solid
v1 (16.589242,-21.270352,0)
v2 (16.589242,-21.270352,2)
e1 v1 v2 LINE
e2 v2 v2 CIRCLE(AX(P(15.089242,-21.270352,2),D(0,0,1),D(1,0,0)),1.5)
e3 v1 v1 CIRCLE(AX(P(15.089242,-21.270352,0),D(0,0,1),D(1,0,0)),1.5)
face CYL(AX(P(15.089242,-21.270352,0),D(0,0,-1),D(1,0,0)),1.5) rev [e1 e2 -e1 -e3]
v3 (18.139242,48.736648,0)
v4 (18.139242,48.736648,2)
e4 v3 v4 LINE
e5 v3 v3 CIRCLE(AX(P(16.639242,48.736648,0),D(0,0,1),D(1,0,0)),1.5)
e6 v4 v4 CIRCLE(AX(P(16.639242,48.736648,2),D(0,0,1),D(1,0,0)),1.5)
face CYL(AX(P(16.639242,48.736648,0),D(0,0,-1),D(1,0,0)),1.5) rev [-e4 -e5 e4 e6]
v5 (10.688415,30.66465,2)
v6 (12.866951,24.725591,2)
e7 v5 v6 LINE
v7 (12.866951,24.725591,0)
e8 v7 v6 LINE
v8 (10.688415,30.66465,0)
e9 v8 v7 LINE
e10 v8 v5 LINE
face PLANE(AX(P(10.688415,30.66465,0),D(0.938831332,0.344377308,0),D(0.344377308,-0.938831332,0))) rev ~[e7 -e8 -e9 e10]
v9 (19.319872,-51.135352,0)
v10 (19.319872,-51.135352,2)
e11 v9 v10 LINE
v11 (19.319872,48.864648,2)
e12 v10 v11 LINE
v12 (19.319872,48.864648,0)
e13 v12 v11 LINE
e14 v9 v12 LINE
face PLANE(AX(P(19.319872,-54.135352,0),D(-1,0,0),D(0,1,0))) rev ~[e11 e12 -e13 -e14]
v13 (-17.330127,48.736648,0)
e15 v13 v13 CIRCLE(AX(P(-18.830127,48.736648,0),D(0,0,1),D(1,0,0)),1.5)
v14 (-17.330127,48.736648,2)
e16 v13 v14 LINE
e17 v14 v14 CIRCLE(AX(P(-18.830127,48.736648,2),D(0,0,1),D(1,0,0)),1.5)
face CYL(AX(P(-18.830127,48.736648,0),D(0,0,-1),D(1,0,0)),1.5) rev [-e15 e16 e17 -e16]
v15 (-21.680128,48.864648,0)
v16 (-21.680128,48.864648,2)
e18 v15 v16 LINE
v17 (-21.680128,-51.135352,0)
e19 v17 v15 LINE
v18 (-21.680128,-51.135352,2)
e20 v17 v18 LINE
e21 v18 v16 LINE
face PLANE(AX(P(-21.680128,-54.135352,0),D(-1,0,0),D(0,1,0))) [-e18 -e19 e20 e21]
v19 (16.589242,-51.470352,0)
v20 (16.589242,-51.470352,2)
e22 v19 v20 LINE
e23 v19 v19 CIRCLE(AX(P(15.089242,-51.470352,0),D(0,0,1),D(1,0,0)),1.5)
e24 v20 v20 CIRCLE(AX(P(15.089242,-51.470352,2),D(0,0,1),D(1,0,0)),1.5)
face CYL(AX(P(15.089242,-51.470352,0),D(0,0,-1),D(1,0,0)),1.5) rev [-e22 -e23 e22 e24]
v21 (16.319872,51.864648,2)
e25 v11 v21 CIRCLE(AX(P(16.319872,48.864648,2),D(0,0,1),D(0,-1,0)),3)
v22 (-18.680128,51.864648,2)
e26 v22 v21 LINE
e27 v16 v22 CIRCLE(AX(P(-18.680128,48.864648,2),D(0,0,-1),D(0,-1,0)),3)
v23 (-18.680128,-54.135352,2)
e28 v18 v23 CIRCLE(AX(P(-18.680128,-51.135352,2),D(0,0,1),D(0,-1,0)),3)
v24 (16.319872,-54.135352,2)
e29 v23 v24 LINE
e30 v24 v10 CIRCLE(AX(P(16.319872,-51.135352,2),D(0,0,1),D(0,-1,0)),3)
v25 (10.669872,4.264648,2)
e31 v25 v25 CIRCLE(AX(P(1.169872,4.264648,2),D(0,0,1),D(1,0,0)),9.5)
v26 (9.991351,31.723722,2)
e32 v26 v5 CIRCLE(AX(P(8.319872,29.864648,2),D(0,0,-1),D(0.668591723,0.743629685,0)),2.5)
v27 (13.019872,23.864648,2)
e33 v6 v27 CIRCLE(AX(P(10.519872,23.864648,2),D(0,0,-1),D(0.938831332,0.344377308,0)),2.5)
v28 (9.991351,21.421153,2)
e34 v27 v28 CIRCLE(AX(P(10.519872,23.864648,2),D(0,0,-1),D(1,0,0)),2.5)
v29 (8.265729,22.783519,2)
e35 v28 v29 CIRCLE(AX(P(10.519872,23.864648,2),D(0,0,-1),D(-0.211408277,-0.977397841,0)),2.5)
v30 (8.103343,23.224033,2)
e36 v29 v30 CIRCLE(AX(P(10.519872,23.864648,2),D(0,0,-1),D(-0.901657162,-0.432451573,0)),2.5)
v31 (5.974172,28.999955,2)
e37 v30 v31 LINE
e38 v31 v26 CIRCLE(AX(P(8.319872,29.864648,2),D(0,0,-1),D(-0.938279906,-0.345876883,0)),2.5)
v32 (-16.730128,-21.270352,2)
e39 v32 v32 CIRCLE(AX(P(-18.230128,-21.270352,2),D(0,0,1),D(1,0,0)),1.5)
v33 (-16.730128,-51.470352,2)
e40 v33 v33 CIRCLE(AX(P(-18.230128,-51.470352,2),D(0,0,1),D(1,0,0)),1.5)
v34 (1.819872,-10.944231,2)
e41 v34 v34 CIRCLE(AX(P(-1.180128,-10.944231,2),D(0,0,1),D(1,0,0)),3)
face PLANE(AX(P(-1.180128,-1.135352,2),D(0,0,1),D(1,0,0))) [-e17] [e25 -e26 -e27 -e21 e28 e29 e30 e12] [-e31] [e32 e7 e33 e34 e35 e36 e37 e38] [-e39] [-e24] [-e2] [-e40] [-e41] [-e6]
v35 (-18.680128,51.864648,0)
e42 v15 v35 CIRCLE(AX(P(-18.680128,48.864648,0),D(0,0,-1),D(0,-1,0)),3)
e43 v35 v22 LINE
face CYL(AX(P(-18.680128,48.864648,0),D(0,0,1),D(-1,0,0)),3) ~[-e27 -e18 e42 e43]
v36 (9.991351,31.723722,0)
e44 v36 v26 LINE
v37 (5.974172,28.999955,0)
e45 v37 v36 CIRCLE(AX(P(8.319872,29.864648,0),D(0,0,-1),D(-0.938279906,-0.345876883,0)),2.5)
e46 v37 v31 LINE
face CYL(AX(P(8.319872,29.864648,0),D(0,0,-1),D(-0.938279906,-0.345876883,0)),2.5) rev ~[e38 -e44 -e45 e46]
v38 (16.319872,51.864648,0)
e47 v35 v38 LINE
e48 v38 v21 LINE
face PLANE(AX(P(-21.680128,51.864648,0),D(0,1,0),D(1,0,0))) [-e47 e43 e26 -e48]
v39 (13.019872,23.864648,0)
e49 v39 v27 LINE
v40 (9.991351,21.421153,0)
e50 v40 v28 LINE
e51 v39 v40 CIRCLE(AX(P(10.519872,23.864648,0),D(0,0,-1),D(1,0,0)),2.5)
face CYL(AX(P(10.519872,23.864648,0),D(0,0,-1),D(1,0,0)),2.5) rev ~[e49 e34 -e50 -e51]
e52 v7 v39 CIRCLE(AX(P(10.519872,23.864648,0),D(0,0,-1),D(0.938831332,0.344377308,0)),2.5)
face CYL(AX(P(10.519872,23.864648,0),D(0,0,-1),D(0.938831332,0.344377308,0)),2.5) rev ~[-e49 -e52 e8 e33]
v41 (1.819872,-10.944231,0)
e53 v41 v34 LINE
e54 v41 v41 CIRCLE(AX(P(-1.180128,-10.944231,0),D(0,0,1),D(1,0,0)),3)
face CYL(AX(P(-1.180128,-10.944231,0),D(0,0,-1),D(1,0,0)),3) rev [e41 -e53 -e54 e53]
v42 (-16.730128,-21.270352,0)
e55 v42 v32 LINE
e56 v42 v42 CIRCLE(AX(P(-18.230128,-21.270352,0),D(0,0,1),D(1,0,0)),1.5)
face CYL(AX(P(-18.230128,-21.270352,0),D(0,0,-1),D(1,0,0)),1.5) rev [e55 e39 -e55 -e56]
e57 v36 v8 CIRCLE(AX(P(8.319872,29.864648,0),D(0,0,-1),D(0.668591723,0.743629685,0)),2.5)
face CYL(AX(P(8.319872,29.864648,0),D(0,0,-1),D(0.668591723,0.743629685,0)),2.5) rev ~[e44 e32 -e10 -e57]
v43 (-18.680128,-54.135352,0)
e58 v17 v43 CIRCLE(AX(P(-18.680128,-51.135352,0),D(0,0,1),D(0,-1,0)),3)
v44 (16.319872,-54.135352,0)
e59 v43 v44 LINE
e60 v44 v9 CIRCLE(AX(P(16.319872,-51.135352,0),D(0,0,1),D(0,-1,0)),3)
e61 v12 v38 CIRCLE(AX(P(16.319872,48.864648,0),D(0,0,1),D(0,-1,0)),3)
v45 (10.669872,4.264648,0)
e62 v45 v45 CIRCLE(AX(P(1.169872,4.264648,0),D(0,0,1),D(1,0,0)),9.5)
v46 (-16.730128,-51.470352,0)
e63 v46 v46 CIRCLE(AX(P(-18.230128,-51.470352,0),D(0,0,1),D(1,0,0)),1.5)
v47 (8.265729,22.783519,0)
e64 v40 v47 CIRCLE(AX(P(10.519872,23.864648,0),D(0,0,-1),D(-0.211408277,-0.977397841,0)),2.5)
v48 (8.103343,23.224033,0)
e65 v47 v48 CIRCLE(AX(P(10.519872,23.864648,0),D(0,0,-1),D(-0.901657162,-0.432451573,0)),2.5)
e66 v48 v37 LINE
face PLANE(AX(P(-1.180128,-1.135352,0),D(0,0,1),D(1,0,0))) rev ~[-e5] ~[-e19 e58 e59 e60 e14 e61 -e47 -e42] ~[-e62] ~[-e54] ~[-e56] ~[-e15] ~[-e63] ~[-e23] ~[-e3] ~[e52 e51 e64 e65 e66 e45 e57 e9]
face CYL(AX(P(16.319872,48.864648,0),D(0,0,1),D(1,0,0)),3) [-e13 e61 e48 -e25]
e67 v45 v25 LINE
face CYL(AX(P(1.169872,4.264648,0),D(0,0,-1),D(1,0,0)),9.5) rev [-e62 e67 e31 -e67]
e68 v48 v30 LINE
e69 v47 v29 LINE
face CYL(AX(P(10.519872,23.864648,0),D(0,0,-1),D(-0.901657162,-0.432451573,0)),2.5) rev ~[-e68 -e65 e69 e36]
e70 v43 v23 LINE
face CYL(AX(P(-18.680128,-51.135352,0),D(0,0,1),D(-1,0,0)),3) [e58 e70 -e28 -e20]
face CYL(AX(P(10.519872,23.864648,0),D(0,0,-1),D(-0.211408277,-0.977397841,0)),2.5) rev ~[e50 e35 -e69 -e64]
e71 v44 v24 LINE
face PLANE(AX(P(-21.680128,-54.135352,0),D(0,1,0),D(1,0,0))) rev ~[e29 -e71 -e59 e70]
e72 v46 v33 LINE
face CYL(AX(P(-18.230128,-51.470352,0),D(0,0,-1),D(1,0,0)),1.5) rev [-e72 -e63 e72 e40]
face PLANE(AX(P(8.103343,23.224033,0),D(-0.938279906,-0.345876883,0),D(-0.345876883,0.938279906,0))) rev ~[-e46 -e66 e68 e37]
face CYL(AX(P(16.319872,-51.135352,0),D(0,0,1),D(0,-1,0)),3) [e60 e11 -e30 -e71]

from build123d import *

# Parameters (mm, degrees)
F0_W     = 41
F0_H     = 106
F0_R     = 1.5
F0_R_2   = 5.05
F0_R_3   = 2
F0_R_4   = 3
F0_R_5   = 9.5
F1_DEPTH = 2
F2_R     = 3


# Not quite as in the source:
# - a feature names something its author has since deleted; it is built from what else it names


with BuildPart() as f1:
    # F0 (on Top) → F1 (new body)
    with BuildSketch(Plane.XY):
        with Locations((-1.1801278293, -1.1353523731)):
            Rectangle(F0_W, F0_H)
        with Locations((-18.2301278293, -51.4703523731)):
            Circle(F0_R, mode=Mode.SUBTRACT)
        with Locations((-6.776117335, -33.481924504)):
            Circle(F0_R_2, mode=Mode.SUBTRACT)
        with Locations((-18.2301278293, -21.2703523731)):
            Circle(F0_R, mode=Mode.SUBTRACT)
        with Locations((-11.8353097141, -18.4490393624)):
            Circle(F0_R_3, mode=Mode.SUBTRACT)
        with BuildLine():
            ThreePointArc((0.9913514778, -28.481924504), (-4.9415118708, -25.855220261), (-8.0481067447, -20.1589485871))
            Line((-8.0481067447, -20.1589485871), (9.9913514778, -20.516399593))
            Line((9.9913514778, -20.516399593), (9.9913514778, -46.516399593))
            Line((9.9913514778, -46.516399593), (-8.0481067447, -46.804900421))
            ThreePointArc((-8.0481067447, -46.804900421), (-4.9415118708, -41.1086287471), (0.9913514778, -38.481924504))
            Line((0.9913514778, -38.481924504), (0.9913514778, -28.481924504))
        make_face(mode=Mode.SUBTRACT)
        with Locations((15.0892422113, -51.4703523731)):
            Circle(F0_R, mode=Mode.SUBTRACT)
        with Locations((-1.1801278293, -10.9442314133)):
            Circle(F0_R_4, mode=Mode.SUBTRACT)
        with Locations((15.0892422113, -21.2703523731)):
            Circle(F0_R, mode=Mode.SUBTRACT)
        with Locations((-11.8353097141, -0.1353523731)):
            Circle(F0_R_3, mode=Mode.SUBTRACT)
        with Locations((-11.8353097141, 18.1783346161)):
            Circle(F0_R_3, mode=Mode.SUBTRACT)
        with Locations((-18.8301271707, 48.7366476269)):
            Circle(F0_R, mode=Mode.SUBTRACT)
        with Locations((-6.776117335, 33.2112197578)):
            Circle(F0_R_2, mode=Mode.SUBTRACT)
        with Locations((1.1698721707, 4.2646476269)):
            Circle(F0_R_5, mode=Mode.SUBTRACT)
        with BuildLine():
            ThreePointArc((0.9913514778, 38.2112197578), (-4.9415118708, 40.8379240009), (-8.0481067447, 46.5341956747))
            Line((-8.0481067447, 46.5341956747), (9.9913514778, 46.2456948468))
            Line((9.9913514778, 46.2456948468), (9.9913514778, 31.7237218389))
            ThreePointArc((9.9913514778, 31.7237218389), (10.4081379557, 31.2391097076), (10.6884153726, 30.6646495649))
            Line((10.6884153726, 30.6646495649), (12.8669505005, 24.7255908967))
            ThreePointArc((12.8669505005, 24.7255908967), (12.9813448828, 24.3018570593), (13.0198721707, 23.8646476269))
            ThreePointArc((13.0198721707, 23.8646476269), (12.0896967258, 21.9189727141), (9.9913514778, 21.4211530234))
            Line((9.9913514778, 21.4211530234), (9.9913514778, 20.2456948468))
            Line((9.9913514778, 20.2456948468), (-8.0481067447, 19.8882438409))
            ThreePointArc((-8.0481067447, 19.8882438409), (-4.9415118708, 25.5845155147), (0.9913514778, 28.2112197578))
            Line((0.9913514778, 28.2112197578), (0.9913514778, 38.2112197578))
        make_face(mode=Mode.SUBTRACT)
        with Locations((16.6392421771, 48.7366476269)):
            Circle(F0_R, mode=Mode.SUBTRACT)
        with BuildLine():
            Line((9.9913514778, -20.516399593), (-8.0481067447, -20.1589485871))
            ThreePointArc((-8.0481067447, -20.1589485871), (-4.9415118708, -25.855220261), (0.9913514778, -28.481924504))
            Line((0.9913514778, -28.481924504), (0.9913514778, -38.481924504))
            ThreePointArc((0.9913514778, -38.481924504), (-4.9415118708, -41.1086287471), (-8.0481067447, -46.804900421))
            Line((-8.0481067447, -46.804900421), (9.9913514778, -46.516399593))
            Line((9.9913514778, -46.516399593), (9.9913514778, -20.516399593))
        make_face()
        with Locations((-2.2937730764, -41.981924504)):
            Circle(F0_R, mode=Mode.SUBTRACT)
        with Locations((-2.2937730764, -24.981924504)):
            Circle(F0_R, mode=Mode.SUBTRACT)
        with BuildLine():
            Line((9.9913514778, 46.2456948468), (-8.0481067447, 46.5341956747))
            ThreePointArc((-8.0481067447, 46.5341956747), (-4.9415118708, 40.8379240009), (0.9913514778, 38.2112197578))
            Line((0.9913514778, 38.2112197578), (0.9913514778, 28.2112197578))
            ThreePointArc((0.9913514778, 28.2112197578), (-4.9415118708, 25.5845155147), (-8.0481067447, 19.8882438409))
            Line((-8.0481067447, 19.8882438409), (9.9913514778, 20.2456948468))
            Line((9.9913514778, 20.2456948468), (9.9913514778, 21.4211530234))
            ThreePointArc((9.9913514778, 21.4211530234), (8.9707387909, 21.9024586015), (8.2657292668, 22.7835186943))
            ThreePointArc((8.2657292668, 22.7835186943), (8.1741724057, 22.9999554201), (8.1033430916, 23.2240329142))
            Line((8.1033430916, 23.2240329142), (5.9741724057, 28.9999554201))
            ThreePointArc((5.9741724057, 28.9999554201), (6.9168863609, 31.9338578186), (9.9913514778, 31.7237218389))
            Line((9.9913514778, 31.7237218389), (9.9913514778, 46.2456948468))
        make_face()
        with Locations((-2.2937730764, 24.7112197578)):
            Circle(F0_R, mode=Mode.SUBTRACT)
        with Locations((-2.2937730764, 41.7112197578)):
            Circle(F0_R, mode=Mode.SUBTRACT)
        with Locations((-6.776117335, 33.2112197578)):
            Circle(F0_R_2)
        with Locations((-6.776117335, -33.481924504)):
            Circle(F0_R_2)
        with Locations((-11.8353097141, -18.4490393624)):
            Circle(F0_R_3)
        with Locations((-11.8353097141, -0.1353523731)):
            Circle(F0_R_3)
        with Locations((-11.8353097141, 18.1783346161)):
            Circle(F0_R_3)
        with Locations((-2.2937730764, -24.981924504)):
            Circle(F0_R)
        with Locations((-2.2937730764, -41.981924504)):
            Circle(F0_R)
        with Locations((-2.2937730764, 24.7112197578)):
            Circle(F0_R)
        with Locations((-2.2937730764, 41.7112197578)):
            Circle(F0_R)
    extrude(amount=F1_DEPTH)

    # F2
    f2_edges = [f1.edges().sort_by_distance(p)[0] for p in [
        (-21.680128, 51.864648, 1),
        (-21.680128, -54.135352, 1),
        (19.319872, -54.135352, 1),
        (19.319872, 51.864648, 1),
    ]]
    fillet(f2_edges, radius=F2_R)


solid = f1.part
